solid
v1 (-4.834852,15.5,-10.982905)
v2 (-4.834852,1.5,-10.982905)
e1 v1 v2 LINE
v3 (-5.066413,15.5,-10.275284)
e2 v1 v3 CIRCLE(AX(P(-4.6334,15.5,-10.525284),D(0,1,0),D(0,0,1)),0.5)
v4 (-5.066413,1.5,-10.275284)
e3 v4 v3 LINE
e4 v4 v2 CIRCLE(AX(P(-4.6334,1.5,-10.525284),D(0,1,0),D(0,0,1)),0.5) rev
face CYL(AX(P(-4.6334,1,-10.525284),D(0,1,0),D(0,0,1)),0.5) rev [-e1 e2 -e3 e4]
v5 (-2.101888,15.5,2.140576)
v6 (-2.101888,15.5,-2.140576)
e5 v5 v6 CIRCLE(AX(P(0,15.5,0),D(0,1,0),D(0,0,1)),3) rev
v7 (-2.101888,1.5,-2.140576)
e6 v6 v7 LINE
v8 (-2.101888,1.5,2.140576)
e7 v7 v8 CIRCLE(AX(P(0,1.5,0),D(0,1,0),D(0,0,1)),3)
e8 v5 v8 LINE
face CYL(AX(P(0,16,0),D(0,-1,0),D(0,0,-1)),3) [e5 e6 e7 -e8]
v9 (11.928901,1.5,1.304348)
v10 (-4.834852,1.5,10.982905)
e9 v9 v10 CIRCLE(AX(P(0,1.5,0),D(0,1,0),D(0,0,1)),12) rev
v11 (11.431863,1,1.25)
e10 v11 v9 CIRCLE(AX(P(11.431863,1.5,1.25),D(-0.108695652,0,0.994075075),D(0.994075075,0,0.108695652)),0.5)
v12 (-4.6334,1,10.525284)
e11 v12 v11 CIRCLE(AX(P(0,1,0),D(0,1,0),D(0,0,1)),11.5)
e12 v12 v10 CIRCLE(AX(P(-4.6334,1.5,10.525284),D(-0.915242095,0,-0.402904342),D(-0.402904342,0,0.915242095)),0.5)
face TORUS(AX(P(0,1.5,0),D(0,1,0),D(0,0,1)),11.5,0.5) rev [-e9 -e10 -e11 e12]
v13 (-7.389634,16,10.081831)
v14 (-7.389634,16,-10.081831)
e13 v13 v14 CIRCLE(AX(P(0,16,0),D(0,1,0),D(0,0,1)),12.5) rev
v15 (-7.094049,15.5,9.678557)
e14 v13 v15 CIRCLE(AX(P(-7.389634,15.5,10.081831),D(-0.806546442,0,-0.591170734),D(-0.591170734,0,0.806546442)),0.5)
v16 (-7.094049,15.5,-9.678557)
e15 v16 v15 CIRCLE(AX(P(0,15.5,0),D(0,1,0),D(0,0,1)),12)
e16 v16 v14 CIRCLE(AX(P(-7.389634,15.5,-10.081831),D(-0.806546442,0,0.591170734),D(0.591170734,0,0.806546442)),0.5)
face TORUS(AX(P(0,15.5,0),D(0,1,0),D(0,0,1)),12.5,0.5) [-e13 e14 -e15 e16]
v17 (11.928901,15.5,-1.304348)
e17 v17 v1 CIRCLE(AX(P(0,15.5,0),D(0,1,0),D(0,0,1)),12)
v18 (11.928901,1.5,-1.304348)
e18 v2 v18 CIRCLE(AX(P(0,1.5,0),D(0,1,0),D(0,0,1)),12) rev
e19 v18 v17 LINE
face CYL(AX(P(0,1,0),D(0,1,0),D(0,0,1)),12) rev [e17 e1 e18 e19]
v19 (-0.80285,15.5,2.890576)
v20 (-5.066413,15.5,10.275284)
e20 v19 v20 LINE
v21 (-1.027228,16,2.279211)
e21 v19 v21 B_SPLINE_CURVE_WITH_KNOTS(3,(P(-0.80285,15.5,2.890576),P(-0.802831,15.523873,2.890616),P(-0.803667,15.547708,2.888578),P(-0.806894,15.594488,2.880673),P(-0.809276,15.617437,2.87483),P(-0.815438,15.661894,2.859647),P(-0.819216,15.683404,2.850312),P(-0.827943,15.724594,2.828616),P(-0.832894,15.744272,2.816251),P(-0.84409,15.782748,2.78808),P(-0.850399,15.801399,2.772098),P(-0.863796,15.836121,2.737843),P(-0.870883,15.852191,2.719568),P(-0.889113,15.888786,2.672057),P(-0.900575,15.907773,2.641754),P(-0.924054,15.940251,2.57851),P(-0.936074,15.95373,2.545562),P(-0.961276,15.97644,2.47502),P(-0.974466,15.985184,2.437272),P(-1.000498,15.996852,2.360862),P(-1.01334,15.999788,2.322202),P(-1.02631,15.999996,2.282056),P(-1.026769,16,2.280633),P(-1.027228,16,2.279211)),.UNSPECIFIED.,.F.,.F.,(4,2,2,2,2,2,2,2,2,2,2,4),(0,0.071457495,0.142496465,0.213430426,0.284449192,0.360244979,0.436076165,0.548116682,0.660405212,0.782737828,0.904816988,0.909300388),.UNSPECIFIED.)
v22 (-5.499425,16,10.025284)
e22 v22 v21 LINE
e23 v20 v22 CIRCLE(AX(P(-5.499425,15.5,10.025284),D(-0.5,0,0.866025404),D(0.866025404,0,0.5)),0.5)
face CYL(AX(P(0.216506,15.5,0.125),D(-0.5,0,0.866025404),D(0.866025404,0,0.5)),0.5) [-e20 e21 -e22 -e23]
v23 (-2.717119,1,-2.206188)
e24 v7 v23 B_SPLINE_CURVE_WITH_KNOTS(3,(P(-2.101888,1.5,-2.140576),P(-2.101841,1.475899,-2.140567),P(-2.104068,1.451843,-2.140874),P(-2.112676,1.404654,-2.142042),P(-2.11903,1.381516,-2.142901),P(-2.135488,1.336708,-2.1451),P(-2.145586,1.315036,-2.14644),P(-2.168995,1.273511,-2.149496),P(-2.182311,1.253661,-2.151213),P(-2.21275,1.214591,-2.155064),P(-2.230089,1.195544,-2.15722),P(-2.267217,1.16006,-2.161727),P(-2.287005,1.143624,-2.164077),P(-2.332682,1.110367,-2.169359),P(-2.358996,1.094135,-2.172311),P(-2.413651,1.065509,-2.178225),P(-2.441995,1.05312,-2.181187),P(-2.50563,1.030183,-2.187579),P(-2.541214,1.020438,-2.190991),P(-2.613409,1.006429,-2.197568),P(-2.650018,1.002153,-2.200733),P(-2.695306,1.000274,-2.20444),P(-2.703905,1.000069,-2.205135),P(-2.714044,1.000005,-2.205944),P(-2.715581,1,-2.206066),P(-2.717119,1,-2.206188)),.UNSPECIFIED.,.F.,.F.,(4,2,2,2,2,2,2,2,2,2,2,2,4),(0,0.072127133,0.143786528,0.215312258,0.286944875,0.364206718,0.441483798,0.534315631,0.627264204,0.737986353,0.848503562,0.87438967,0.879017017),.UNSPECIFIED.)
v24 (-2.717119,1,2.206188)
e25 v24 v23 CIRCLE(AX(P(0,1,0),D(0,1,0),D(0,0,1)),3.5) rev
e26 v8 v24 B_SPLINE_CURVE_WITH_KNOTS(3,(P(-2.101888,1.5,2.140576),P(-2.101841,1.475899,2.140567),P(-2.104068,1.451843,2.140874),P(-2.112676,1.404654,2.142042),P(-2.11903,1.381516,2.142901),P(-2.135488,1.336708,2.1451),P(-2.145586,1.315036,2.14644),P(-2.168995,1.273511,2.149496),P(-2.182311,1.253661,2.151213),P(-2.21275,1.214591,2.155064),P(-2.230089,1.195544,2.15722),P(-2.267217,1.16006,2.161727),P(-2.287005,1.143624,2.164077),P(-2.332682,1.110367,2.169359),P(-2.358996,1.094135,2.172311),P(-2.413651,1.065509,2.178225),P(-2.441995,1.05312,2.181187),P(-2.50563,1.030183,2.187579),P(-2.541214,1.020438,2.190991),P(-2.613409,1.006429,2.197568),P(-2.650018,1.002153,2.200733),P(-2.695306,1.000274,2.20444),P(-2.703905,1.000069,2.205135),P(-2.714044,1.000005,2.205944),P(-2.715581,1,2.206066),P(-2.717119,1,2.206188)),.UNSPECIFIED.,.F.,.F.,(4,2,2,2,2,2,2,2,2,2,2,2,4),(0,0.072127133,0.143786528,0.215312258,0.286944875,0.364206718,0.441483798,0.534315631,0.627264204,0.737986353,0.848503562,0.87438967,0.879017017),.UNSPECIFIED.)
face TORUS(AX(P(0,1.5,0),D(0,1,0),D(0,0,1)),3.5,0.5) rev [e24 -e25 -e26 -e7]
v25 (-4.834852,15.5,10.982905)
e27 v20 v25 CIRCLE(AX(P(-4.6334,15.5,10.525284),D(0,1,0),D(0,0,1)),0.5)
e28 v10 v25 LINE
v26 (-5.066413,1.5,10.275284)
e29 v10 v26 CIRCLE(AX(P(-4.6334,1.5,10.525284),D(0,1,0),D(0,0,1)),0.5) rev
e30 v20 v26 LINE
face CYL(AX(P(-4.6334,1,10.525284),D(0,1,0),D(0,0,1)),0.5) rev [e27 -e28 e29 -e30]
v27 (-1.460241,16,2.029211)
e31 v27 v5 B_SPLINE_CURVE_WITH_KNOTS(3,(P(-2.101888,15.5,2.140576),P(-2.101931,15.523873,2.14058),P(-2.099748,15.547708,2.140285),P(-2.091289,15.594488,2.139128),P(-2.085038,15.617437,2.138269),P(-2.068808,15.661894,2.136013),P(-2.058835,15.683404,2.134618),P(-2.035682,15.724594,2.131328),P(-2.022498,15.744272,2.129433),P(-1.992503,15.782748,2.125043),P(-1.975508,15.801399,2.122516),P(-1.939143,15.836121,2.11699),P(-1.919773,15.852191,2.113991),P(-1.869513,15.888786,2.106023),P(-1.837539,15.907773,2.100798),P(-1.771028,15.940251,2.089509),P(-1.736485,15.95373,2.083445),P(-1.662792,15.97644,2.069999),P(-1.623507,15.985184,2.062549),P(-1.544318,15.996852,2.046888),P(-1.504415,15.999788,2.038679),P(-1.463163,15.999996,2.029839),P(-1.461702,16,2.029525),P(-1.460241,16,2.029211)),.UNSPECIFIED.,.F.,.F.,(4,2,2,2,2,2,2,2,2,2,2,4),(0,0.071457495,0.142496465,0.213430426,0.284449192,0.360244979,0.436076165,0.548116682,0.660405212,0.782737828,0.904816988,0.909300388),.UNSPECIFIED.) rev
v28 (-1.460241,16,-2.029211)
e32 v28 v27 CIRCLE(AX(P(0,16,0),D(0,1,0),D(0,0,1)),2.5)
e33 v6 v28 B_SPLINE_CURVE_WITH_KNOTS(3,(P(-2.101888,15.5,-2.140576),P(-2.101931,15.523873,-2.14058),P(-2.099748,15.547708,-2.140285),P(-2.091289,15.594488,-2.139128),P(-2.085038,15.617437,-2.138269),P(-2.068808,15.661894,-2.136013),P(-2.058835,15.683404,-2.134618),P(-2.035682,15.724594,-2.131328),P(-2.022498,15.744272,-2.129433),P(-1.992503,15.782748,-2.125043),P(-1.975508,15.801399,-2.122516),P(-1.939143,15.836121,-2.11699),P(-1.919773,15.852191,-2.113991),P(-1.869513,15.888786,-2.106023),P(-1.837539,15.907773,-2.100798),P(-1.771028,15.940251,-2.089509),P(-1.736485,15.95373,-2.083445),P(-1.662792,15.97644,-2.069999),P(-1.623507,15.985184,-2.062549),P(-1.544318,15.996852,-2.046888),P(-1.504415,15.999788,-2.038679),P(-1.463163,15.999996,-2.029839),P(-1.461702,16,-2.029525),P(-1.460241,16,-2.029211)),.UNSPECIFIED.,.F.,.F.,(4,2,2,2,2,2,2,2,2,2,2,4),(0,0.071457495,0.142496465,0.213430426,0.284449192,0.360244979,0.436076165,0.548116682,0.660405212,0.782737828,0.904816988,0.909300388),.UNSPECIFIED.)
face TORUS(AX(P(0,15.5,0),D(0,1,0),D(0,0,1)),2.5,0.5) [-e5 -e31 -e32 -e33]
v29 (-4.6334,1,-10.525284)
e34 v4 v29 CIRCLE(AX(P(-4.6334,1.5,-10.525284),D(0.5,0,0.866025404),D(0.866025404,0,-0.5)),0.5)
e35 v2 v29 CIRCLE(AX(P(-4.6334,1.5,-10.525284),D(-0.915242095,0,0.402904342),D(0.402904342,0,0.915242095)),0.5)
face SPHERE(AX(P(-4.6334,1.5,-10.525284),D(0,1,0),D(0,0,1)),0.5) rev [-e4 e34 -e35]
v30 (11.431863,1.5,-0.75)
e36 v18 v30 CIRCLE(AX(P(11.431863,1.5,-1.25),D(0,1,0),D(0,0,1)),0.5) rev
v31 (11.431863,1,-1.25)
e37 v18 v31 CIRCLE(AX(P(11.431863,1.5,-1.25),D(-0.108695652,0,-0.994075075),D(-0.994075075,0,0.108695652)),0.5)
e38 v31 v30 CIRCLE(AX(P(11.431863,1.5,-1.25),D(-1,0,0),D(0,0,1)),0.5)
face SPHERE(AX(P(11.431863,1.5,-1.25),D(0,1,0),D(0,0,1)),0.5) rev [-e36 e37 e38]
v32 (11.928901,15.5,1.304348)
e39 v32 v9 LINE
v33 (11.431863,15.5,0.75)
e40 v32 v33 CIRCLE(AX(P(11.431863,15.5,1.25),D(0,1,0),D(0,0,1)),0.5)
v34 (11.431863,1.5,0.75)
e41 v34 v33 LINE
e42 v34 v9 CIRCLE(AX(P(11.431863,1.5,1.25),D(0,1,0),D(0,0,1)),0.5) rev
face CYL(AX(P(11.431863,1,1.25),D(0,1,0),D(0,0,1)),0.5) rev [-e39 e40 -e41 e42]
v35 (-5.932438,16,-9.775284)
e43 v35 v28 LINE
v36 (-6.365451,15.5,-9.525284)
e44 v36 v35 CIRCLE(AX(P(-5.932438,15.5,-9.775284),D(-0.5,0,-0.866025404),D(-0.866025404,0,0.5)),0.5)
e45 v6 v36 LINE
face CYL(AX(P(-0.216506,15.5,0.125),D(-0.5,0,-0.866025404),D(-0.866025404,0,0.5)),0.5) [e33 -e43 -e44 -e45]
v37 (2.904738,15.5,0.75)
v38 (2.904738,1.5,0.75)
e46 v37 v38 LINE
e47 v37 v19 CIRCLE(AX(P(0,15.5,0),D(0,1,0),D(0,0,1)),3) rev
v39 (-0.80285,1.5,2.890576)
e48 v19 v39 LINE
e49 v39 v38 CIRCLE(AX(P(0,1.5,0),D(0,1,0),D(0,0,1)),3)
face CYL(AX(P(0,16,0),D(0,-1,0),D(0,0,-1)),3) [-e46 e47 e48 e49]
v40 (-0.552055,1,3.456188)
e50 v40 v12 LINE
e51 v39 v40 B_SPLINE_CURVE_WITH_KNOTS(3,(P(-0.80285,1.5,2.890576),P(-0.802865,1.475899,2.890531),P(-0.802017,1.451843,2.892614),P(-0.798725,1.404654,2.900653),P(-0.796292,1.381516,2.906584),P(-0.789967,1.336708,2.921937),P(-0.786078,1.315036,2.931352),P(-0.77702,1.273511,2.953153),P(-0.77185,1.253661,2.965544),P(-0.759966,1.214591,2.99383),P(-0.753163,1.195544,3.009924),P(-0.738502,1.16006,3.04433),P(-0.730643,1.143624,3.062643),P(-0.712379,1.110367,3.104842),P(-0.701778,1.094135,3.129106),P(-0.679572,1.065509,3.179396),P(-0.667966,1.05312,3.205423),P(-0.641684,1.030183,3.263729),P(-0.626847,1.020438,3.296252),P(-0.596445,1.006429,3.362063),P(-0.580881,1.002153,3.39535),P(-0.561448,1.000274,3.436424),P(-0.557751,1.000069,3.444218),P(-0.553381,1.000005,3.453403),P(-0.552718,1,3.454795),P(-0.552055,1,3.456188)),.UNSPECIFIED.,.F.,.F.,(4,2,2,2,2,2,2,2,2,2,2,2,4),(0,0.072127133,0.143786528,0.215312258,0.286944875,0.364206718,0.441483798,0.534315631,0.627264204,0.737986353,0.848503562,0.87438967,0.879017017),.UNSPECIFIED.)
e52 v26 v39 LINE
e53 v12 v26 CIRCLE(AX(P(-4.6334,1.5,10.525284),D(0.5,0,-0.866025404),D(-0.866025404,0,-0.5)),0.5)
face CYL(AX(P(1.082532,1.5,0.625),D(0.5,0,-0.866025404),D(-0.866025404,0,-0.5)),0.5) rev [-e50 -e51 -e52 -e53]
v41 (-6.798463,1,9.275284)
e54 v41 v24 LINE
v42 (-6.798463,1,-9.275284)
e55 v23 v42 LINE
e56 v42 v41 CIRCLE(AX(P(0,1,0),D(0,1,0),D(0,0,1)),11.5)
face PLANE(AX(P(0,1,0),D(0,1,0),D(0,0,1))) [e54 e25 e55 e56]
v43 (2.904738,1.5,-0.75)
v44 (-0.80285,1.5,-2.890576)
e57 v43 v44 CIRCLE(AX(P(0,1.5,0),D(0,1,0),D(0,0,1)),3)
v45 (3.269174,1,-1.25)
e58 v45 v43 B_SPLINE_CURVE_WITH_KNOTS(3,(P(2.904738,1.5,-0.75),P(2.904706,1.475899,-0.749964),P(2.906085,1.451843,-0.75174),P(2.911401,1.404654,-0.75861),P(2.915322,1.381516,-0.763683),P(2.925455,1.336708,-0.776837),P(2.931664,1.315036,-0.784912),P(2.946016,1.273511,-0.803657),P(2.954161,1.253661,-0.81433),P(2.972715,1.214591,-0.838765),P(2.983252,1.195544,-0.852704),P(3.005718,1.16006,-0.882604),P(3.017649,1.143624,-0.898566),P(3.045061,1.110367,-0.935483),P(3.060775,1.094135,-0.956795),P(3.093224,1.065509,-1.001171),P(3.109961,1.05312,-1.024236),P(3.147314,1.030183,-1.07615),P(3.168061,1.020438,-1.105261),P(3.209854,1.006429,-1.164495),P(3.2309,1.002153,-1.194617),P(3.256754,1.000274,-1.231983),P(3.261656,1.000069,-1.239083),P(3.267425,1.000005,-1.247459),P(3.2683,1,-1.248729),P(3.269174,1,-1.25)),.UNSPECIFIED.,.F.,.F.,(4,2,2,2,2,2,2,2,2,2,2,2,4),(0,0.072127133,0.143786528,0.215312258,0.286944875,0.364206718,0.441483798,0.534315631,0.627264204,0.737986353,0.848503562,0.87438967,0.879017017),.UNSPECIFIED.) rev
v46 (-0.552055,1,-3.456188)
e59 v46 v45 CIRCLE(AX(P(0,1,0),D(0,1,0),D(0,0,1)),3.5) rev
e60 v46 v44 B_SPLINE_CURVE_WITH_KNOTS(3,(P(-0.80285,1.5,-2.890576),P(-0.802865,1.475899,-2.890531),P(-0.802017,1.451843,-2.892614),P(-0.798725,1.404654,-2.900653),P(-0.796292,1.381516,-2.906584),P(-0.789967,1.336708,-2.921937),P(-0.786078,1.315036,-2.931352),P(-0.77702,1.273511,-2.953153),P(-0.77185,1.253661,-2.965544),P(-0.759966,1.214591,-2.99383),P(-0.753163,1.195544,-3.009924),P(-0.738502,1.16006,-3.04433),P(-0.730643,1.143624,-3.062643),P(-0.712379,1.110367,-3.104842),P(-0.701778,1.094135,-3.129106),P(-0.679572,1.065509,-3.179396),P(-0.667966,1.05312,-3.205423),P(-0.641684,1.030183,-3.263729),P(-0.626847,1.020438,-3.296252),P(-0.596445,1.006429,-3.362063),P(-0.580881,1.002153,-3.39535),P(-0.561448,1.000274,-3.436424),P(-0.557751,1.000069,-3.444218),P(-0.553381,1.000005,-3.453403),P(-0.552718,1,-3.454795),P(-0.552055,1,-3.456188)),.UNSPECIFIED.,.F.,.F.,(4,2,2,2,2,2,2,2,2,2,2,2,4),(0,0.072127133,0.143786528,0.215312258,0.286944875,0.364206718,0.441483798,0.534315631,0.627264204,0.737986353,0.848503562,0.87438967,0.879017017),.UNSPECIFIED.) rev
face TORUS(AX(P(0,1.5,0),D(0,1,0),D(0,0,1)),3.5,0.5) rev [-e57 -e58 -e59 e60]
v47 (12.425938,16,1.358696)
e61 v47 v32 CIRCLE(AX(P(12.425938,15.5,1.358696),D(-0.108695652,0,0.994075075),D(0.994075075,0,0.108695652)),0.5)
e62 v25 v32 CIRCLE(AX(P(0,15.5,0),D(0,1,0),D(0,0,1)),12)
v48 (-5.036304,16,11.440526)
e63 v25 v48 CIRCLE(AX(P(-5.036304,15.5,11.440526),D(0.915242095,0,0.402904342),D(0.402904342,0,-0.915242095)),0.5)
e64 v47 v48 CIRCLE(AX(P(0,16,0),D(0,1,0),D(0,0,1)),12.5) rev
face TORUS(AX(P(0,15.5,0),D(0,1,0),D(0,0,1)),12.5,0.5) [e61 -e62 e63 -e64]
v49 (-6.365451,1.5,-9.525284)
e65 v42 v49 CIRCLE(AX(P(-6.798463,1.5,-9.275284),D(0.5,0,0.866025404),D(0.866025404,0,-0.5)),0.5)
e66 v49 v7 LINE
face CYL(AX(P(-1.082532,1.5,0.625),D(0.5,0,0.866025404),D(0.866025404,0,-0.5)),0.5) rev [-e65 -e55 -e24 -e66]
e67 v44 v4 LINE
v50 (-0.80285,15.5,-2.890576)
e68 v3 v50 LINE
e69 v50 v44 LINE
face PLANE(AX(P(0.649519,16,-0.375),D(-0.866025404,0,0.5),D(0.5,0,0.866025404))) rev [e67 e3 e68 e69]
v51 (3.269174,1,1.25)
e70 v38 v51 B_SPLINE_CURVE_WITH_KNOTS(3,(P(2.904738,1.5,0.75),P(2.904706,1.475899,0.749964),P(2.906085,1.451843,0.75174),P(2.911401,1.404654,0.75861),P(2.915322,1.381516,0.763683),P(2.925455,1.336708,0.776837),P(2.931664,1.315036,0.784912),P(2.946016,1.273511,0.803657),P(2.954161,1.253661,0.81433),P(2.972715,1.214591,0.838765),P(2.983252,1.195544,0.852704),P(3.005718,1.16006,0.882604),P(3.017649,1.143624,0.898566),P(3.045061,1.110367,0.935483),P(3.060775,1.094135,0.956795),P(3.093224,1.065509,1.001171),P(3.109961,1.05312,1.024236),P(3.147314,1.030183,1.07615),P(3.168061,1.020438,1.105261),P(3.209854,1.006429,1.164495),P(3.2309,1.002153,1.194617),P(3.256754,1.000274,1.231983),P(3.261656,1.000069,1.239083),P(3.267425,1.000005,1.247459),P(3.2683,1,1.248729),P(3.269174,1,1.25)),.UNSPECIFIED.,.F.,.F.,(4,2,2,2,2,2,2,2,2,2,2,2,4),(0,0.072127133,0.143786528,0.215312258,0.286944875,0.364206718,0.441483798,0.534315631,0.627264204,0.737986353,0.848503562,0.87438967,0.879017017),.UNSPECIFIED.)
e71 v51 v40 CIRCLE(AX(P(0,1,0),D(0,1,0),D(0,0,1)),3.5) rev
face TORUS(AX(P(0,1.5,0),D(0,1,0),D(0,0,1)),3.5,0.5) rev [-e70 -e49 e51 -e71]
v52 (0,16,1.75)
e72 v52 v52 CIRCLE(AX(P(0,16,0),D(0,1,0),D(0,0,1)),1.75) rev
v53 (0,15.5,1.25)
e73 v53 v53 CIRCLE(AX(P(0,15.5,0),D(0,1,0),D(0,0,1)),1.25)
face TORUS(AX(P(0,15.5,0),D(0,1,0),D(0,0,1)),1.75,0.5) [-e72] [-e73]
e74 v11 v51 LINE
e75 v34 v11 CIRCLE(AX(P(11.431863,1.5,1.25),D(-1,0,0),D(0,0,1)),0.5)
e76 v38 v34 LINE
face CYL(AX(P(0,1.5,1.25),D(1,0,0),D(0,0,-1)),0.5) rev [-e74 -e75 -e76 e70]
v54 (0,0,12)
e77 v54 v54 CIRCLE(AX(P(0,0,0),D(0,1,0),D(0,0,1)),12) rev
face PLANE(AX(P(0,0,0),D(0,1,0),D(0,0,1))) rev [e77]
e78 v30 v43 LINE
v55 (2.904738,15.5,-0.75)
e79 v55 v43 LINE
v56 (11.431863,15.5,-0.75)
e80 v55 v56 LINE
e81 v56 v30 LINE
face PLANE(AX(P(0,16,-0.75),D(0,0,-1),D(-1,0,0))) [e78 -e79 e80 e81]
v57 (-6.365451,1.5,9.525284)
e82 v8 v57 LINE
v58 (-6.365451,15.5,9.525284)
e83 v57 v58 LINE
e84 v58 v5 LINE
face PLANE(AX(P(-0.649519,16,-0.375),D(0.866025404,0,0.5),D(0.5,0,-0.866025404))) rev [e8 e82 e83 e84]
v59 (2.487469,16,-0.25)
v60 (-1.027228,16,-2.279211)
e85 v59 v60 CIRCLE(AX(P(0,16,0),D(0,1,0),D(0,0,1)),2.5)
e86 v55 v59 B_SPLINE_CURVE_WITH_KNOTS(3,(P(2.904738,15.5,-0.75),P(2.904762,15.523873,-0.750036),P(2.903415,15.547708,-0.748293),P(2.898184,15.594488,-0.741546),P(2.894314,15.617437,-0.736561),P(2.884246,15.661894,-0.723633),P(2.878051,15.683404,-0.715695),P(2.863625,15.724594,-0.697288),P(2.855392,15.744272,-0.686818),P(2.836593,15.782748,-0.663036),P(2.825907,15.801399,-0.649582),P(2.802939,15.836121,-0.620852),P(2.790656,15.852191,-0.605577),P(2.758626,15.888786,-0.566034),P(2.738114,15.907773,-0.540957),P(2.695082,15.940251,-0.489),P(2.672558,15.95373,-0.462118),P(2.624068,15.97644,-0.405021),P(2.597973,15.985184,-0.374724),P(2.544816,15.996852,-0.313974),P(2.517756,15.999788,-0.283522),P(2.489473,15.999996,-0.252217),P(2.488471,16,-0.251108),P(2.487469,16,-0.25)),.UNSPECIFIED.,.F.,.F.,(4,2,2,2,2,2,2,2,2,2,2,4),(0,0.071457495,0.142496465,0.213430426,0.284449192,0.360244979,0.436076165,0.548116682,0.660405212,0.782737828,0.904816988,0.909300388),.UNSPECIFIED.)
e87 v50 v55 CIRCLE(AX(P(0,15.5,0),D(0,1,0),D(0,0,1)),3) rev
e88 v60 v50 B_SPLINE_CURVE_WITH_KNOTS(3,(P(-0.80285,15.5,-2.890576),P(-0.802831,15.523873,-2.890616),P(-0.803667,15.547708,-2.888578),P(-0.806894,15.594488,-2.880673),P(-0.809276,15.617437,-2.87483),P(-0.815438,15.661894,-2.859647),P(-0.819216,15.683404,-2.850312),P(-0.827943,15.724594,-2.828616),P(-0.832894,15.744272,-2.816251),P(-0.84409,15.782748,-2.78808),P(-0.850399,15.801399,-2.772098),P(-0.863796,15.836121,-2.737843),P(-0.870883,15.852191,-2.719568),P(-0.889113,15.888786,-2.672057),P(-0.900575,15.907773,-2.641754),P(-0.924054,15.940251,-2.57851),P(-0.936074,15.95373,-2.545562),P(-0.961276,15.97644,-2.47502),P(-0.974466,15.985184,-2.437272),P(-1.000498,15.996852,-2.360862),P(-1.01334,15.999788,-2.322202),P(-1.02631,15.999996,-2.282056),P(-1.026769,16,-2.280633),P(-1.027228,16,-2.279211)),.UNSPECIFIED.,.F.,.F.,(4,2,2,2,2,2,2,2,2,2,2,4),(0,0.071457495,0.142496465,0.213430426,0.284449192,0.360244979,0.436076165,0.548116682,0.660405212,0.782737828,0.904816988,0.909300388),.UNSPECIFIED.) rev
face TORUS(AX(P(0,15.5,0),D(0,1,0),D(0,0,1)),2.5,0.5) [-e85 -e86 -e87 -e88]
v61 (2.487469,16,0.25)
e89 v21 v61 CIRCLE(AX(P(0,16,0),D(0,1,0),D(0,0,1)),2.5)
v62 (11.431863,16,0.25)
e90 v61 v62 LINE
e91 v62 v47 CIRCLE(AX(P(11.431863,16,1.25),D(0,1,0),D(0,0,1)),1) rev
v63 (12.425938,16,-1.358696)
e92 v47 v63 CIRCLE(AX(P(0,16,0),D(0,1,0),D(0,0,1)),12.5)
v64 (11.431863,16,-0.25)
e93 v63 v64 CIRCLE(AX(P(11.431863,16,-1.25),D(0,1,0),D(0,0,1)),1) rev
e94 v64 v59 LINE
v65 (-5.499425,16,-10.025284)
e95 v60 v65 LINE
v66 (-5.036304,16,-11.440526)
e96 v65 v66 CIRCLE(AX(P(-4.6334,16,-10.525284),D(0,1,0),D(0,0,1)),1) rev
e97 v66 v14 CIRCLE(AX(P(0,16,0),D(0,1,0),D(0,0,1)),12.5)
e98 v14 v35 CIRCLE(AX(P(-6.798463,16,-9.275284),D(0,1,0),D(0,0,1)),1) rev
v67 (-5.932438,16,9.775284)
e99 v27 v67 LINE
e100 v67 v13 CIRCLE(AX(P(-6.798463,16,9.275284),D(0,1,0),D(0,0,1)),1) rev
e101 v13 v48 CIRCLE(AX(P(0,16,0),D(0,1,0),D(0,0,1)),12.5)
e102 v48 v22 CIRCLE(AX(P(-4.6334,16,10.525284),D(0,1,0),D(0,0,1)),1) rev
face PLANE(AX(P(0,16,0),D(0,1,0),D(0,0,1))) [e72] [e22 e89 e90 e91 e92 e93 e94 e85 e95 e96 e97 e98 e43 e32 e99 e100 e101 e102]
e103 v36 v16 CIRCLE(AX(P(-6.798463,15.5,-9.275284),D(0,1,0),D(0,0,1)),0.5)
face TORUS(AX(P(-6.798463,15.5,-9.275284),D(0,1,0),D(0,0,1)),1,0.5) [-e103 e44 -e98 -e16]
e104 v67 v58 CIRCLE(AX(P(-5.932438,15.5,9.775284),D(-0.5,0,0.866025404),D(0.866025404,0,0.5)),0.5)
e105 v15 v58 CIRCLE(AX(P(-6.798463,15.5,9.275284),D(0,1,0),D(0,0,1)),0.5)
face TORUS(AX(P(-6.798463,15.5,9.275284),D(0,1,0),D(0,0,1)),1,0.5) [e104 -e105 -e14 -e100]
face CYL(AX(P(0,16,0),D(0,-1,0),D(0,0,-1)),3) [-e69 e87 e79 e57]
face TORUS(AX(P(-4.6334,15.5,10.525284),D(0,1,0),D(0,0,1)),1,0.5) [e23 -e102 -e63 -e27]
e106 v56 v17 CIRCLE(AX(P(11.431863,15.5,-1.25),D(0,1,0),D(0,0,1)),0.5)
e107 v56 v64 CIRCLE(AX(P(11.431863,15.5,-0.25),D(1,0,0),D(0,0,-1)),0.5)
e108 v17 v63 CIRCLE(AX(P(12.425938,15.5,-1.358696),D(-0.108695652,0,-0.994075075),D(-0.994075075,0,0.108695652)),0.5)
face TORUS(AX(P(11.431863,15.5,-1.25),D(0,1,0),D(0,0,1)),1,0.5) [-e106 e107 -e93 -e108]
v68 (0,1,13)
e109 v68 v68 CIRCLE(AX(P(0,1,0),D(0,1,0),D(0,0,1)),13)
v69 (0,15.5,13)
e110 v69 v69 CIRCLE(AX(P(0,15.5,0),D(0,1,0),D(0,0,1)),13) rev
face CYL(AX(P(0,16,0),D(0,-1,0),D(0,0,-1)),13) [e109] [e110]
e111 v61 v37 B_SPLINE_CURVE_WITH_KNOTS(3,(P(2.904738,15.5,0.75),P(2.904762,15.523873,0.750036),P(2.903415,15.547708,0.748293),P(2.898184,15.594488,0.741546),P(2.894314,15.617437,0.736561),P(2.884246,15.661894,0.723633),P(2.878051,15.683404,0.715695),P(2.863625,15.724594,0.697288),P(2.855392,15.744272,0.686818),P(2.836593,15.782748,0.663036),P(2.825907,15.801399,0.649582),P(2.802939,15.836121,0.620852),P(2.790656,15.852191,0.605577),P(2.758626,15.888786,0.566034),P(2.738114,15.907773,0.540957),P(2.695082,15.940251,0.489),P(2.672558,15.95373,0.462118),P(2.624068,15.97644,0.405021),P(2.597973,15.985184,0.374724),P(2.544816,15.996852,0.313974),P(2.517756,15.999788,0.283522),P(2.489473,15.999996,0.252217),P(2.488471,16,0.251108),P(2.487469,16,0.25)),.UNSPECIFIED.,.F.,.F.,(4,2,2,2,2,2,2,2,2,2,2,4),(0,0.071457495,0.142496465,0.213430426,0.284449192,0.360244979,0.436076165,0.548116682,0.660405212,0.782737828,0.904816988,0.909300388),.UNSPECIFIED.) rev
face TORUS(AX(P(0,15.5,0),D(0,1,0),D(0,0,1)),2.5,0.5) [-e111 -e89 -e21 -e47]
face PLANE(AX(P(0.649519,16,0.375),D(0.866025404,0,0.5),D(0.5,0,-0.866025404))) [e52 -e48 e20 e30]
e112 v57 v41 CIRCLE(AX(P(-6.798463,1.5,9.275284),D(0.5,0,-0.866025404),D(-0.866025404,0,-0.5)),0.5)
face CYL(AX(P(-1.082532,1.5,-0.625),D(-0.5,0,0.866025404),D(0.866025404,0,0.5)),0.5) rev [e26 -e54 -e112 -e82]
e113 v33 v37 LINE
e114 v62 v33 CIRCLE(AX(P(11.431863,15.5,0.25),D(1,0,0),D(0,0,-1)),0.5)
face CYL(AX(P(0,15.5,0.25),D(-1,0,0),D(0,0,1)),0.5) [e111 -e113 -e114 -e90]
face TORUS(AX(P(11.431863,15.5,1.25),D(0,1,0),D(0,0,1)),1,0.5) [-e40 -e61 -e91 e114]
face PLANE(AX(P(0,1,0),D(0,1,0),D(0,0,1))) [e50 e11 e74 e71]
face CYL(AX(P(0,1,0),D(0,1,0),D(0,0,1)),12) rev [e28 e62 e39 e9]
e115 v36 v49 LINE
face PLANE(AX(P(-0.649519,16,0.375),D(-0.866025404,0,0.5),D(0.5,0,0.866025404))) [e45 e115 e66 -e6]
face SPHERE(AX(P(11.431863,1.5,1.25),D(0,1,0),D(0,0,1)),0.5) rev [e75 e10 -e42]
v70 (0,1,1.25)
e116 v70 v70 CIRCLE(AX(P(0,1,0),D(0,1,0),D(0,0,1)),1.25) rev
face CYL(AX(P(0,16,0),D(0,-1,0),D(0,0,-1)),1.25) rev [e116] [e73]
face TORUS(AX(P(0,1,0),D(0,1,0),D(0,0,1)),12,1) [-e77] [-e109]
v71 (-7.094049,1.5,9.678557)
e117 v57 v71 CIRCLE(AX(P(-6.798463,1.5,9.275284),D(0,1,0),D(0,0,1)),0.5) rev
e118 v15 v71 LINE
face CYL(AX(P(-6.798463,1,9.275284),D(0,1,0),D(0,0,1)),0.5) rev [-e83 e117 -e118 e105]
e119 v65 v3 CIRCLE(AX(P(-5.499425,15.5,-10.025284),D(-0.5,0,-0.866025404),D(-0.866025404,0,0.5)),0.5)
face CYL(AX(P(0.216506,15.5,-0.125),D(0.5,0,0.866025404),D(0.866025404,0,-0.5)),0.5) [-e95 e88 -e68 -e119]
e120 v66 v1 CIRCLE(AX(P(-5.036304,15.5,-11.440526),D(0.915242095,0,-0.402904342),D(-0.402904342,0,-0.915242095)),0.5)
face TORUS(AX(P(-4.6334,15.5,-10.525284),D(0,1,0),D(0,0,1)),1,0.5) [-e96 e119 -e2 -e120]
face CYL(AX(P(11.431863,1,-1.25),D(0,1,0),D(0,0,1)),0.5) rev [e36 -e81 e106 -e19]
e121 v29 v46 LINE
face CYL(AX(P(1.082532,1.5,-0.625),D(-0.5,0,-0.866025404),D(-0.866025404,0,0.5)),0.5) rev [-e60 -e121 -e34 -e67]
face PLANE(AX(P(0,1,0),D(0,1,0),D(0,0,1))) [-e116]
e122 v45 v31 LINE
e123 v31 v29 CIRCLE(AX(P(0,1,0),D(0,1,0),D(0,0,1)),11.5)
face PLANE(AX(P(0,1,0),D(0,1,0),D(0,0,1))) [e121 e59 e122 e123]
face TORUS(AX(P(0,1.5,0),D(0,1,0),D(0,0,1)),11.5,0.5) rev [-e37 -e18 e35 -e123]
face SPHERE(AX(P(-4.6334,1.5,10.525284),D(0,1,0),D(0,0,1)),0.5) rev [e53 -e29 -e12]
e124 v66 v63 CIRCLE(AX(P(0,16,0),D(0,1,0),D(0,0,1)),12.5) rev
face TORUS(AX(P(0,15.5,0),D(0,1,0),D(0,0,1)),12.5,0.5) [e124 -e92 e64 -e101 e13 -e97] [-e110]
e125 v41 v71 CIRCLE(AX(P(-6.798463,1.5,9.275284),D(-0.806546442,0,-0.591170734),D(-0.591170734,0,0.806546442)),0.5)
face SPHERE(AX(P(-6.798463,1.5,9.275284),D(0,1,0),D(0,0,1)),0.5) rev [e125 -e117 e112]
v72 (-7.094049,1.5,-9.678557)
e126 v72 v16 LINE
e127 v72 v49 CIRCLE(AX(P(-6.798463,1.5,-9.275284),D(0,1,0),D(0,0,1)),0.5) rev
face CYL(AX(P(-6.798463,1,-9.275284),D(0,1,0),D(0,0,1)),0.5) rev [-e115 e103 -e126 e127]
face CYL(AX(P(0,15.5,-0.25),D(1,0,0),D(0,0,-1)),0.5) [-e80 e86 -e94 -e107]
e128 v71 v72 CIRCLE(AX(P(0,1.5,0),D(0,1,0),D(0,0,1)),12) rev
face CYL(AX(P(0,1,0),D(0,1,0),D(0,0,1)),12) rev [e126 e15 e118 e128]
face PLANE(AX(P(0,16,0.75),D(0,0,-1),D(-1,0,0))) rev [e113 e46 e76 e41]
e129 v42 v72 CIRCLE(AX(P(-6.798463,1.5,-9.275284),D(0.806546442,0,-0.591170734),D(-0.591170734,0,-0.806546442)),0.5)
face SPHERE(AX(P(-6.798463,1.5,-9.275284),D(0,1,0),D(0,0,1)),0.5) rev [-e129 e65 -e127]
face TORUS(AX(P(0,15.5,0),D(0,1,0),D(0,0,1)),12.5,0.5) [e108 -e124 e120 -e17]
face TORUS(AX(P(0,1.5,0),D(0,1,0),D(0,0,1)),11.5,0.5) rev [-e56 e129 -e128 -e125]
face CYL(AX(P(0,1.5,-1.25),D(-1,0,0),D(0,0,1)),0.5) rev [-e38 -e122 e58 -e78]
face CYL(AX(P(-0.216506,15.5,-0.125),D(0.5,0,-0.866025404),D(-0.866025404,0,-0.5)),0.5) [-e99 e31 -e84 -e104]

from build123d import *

# Parameters (mm, degrees)
SKETCH1_R           = 13
BOSS_EXTRUDE1_DEPTH = 16
SKETCH2_R           = 12
CUT_EXTRUDE1_DEPTH  = 15
SKETCH3_R           = 3
SKETCH3_R_2         = 1.25
BOSS_EXTRUDE3_DEPTH = 15
BOSS_EXTRUDE4_START = 15
BOSS_EXTRUDE4_DEPTH = 15
FILLET4_R           = 0.5
FILLET8_R           = 0.5
FILLET9_R           = 0.5
FILLET10_R          = 1


with BuildPart() as part:
    # Sketch1 → Boss-Extrude1 (new body)
    with BuildSketch(Plane(origin=(0, 0, 0), x_dir=(1, 0, 0), z_dir=(0, 1, 0))):
        with Locations(Location((0, 0, 0), (0, 0, 270))):
            Circle(SKETCH1_R)
    extrude(amount=BOSS_EXTRUDE1_DEPTH)

    # Sketch2 → Cut-Extrude1 (cut)
    with BuildSketch(Plane(origin=(0, 16, 0), x_dir=(1, 0, 0), z_dir=(0, 1, 0))):
        with Locations(Location((0, 0, 0), (0, 0, 270))):
            Circle(SKETCH2_R)
    extrude(amount=-CUT_EXTRUDE1_DEPTH, mode=Mode.SUBTRACT)

    # Sketch3 → Boss-Extrude3 (add)
    with BuildSketch(Plane(origin=(0, 1.0000000000000009, 0), x_dir=(1, 0, 0), z_dir=(0, 1, 0))):
        with Locations(Location((0, 0, 0), (0, 0, 270))):
            Circle(SKETCH3_R)
        with Locations(Location((0, 0, 0), (0, 0, 270))):
            Circle(SKETCH3_R_2, mode=Mode.SUBTRACT)
    extrude(amount=BOSS_EXTRUDE3_DEPTH)

    # Sketch5 → Boss-Extrude4 (add)
    with BuildSketch(Plane(origin=(0, 1.0000000000000009, 0), x_dir=(1, 0, 0), z_dir=(0, 1, 0)).offset(BOSS_EXTRUDE4_START)):
        with BuildLine():
            Line((-1.9485571585149906, -1.8750000000000073), (-6.637788836339994, -9.99698751445455))
            ThreePointArc((-6.637788836339994, -9.99698751445455), (-5.999999999999962, -10.392304845413287), (-5.338750730663418, -10.746987514454501))
            Line((-5.338750730663418, -10.746987514454501), (-0.6495190528383291, -2.6249999999999987))
            Line((-0.6495190528383291, -2.6249999999999987), (-1.9485571585149906, -1.8750000000000073))
        make_face()
        with BuildLine():
            Line((2.5980762113533236, -0.75), (11.976539567003487, -0.75))
            ThreePointArc((11.976539567003487, -0.75), (12.000000000000002, 0), (11.976539567003487, 0.75))
            Line((11.976539567003487, 0.75), (2.5980762113533102, 0.75))
            Line((2.5980762113533102, 0.75), (2.5980762113533236, -0.75))
        make_face()
        with BuildLine():
            Line((-0.6495190528383203, 2.6249999999999893), (-5.3387507306632696, 10.746987514454572))
            ThreePointArc((-5.3387507306632696, 10.746987514454572), (-5.999999999999985, 10.392304845413275), (-6.637788836340183, 9.996987514454428))
            Line((-6.637788836340183, 9.996987514454428), (-1.9485571585149792, 1.8749999999999911))
            Line((-1.9485571585149792, 1.8749999999999911), (-0.6495190528383203, 2.6249999999999893))
        make_face()
    extrude(amount=-BOSS_EXTRUDE4_DEPTH)

    # Fillet4
    fillet4_edges = [part.edges().sort_by_distance(p)[0] for p in [
        (-5.338750730663417, 8.5, 10.746987514454503),
        (-6.637788836339995, 8.5, 9.99698751445455),
        (11.976539567003487, 8.5, -0.7499999999999999),
        (11.976539567003487, 8.5, 0.75),
        (-6.637788836340183, 8.5, -9.996987514454428),
        (-5.3387507306632696, 8.5, -10.746987514454574),
    ]]
    fillet(fillet4_edges, radius=FILLET4_R)

    # Fillet8
    fillet8_edges = [part.edges().sort_by_distance(p)[0] for p in [
        (-6.695532692704444, 16, -9.764574656753775),
        (11.804136056250712, 16, 0.9162140753742581),
        (-6.695532692704263, 16, 9.764574656753897),
        (-5.108603363546381, 16, 10.680788732128102),
        (3.8e-16, 16, -1.25),
        (1.4999999999999452, 16, 2.598076211353348),
        (-2.9346311658689803, 16, 6.582930280760159),
        (-4.2336692715456055, 16, 5.8329302807601975),
        (1.4999999999999785, 16, -2.5980762113533284),
        (7.168300437414603, 16, -0.75),
        (7.168300437414587, 16, 0.75),
        (3.98e-15, 16, -13),
        (-3, 16, -1.1e-15),
        (-4.233669271545697, 16, -5.83293028076014),
        (-2.9346311658689084, 16, -6.5829302807601975),
        (6.000000000000071, 16, -10.392304845413223),
        (-12, 16, 1.0217e-13),
        (5.999999999999999, 16, 10.392304845413266),
        (-5.108603363546235, 16, -10.680788732128176),
        (11.804136056250712, 16, -0.9162140753742588),
    ]]
    fillet(fillet8_edges, radius=FILLET8_R - 0.0001)  # a hair under: the kernel refuses the full size

    # Fillet9
    fillet9_edges = [part.edges().sort_by_distance(p)[0] for p in [
        (1.4999999999999454, 1.0000000000000009, 2.5980762113533475),
        (-4.2336692715456055, 1.0000000000000009, 5.8329302807601975),
        (-2.9346311658689803, 1.0000000000000009, 6.582930280760159),
        (1.4999999999999785, 1.0000000000000009, -2.5980762113533284),
        (7.168300437414587, 1.0000000000000009, 0.75),
        (7.168300437414603, 1.0000000000000009, -0.75),
        (-3, 1.0000000000000009, 1.56e-15),
        (-2.9346311658689084, 1.0000000000000009, -6.5829302807601975),
        (-4.233669271545697, 1.0000000000000009, -5.832930280760139),
        (6.000000000000071, 1, -10.392304845413223),
        (11.804136056250712, 1, -0.9162140753742588),
        (-5.108603363546235, 1, -10.680788732128176),
        (-12, 1, 1.0217e-13),
        (-6.695532692704263, 1, 9.764574656753897),
        (-6.695532692704444, 1, -9.764574656753775),
        (5.999999999999999, 1.0000000000000004, 10.392304845413266),
        (-5.108603363546381, 1, 10.680788732128102),
        (11.804136056250712, 1, 0.9162140753742581),
    ]]
    fillet(fillet9_edges, radius=FILLET9_R)

    # Fillet10
    fillet10_edges = [part.edges().sort_by_distance(p)[0] for p in [
        (-1.79e-15, 0, -13),
    ]]
    fillet(fillet10_edges, radius=FILLET10_R)


solid = part.part
